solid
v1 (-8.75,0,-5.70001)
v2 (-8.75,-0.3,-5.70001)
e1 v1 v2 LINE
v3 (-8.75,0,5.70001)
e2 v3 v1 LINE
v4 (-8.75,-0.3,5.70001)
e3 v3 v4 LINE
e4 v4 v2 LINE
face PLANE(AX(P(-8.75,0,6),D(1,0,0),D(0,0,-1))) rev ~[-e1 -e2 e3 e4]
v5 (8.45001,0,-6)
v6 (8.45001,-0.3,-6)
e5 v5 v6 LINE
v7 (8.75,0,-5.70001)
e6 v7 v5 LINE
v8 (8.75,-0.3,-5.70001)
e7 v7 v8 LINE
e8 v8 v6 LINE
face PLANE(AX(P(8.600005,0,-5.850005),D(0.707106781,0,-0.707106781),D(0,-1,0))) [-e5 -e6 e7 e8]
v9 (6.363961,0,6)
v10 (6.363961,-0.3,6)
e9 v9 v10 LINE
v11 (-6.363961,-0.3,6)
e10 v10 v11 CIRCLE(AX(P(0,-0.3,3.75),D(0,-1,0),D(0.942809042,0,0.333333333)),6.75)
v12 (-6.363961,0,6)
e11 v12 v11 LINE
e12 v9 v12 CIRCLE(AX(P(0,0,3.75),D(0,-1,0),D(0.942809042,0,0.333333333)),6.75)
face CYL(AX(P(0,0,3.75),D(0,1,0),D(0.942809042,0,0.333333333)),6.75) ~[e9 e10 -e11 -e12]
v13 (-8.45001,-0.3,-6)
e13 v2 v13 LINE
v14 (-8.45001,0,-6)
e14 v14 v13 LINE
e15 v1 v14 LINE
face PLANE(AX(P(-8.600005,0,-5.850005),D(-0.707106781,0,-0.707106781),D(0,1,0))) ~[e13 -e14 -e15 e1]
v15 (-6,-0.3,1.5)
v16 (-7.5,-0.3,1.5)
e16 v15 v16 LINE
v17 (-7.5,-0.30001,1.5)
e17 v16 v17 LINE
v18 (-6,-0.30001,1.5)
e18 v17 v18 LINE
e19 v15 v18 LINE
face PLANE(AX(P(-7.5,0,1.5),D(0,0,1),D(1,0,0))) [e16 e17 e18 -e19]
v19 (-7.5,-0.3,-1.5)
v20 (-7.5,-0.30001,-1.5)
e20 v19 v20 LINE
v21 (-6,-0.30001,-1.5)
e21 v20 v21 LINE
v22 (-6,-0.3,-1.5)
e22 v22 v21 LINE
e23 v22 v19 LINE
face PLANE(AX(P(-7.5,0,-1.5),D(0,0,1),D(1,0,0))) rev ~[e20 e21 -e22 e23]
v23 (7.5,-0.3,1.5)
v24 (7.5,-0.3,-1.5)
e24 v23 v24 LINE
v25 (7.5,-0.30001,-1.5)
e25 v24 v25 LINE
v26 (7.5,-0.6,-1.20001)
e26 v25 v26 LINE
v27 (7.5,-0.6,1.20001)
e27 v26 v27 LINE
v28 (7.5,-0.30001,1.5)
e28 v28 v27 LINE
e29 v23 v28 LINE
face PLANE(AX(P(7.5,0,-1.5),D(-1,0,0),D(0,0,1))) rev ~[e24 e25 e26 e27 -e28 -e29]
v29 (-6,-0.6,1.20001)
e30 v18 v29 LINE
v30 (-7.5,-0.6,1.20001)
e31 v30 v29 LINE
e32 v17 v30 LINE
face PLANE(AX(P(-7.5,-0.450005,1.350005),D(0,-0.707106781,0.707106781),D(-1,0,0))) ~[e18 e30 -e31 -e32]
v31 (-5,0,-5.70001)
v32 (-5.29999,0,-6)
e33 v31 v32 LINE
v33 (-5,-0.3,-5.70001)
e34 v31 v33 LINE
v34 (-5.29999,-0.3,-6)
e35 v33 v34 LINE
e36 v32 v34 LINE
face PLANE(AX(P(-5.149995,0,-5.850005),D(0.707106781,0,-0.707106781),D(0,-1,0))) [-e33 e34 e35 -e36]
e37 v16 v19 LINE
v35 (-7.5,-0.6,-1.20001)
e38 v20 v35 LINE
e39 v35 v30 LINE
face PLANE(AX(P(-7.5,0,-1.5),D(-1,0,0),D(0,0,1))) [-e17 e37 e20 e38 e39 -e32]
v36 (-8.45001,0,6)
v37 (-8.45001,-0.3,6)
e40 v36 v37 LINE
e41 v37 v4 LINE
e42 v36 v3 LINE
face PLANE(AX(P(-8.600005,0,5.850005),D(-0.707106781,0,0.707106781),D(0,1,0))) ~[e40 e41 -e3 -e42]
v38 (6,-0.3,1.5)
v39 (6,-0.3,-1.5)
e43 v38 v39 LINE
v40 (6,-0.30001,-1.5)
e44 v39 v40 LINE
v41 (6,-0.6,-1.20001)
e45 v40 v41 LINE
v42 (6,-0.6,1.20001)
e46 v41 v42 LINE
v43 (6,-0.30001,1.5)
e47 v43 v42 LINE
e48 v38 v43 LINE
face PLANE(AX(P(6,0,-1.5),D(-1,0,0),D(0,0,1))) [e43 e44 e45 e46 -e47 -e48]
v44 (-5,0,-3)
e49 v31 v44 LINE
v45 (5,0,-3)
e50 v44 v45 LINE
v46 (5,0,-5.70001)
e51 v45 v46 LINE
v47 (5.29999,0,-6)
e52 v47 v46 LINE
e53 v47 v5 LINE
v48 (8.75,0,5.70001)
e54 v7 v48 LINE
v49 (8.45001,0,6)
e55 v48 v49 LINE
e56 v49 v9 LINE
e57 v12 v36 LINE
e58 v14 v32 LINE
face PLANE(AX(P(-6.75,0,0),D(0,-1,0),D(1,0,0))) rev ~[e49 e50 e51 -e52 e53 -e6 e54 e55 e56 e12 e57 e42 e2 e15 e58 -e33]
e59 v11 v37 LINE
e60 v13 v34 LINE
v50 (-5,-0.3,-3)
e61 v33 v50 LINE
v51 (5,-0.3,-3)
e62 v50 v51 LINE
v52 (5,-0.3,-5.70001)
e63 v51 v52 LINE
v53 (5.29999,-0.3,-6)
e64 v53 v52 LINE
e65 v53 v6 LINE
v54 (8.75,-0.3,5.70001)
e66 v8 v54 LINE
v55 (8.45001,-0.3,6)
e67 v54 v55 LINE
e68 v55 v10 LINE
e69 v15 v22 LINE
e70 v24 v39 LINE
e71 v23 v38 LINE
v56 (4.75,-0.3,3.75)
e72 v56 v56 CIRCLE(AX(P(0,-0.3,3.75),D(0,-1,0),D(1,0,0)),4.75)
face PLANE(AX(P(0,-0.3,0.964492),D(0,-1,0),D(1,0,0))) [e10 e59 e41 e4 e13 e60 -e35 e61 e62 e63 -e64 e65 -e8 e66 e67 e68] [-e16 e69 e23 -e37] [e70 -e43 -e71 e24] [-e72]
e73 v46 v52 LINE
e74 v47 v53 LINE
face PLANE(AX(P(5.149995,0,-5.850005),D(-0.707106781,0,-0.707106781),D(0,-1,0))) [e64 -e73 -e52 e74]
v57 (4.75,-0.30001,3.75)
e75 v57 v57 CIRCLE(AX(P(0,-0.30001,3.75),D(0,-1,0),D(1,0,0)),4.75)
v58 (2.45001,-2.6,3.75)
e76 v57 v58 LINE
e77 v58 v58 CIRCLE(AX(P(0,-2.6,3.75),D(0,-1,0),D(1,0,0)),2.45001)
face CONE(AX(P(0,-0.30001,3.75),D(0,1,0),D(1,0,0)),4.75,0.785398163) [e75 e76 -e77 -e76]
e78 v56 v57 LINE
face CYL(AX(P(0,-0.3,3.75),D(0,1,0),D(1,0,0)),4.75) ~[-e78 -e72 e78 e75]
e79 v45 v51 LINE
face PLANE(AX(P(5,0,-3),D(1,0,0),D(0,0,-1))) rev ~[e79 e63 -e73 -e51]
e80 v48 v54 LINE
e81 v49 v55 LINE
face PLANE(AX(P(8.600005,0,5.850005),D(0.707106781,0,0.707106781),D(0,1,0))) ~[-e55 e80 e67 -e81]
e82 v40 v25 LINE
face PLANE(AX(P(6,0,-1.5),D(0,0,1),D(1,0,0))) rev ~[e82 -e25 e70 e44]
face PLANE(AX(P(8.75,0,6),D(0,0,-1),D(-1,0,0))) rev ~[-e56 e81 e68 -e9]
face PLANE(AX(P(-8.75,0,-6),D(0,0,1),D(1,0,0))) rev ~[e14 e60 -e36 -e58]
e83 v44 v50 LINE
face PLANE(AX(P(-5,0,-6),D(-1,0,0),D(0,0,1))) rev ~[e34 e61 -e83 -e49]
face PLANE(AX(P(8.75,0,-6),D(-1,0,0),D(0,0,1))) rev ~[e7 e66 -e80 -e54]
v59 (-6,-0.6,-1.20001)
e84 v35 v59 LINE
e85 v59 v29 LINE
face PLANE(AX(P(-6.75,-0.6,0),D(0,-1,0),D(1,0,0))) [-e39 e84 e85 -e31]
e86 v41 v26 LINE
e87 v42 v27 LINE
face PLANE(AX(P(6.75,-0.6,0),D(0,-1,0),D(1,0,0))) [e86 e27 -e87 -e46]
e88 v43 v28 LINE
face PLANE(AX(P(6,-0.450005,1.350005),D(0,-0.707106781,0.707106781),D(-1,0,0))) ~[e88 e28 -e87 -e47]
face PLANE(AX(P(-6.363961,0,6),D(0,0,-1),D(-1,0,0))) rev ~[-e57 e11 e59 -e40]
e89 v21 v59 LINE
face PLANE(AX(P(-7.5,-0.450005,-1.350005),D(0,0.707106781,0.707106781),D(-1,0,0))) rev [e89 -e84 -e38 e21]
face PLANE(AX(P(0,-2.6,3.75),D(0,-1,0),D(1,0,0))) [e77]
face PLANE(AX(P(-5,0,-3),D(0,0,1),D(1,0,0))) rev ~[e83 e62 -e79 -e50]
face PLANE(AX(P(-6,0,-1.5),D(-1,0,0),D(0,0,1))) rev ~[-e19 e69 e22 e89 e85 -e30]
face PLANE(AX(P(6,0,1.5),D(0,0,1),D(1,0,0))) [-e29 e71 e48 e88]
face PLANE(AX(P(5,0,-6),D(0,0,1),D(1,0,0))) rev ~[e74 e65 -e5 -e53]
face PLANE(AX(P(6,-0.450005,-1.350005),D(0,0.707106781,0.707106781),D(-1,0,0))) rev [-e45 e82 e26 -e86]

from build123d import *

# Parameters (mm, degrees)
F0_W     = 1.5
F0_H     = 3
F1_DEPTH = 0.3
F2_DEPTH = 0.6
F3_R     = 4.75
F4_DEPTH = 2.3
F5_SIZE  = 2.29999
F6_SIZE  = 0.29999


# Not quite as in the source:
# - a fillet or chamfer is up to 0.001 mm smaller than in the source, because OpenCascade refuses the exact size


with BuildPart() as f1:
    # F0 (on Front) → F1 (new body)
    with BuildSketch(Plane.XZ):
        with BuildLine():
            Line((8.75, -6), (8.75, 6))
            Line((8.75, 6), (6.3639610307, 6))
            ThreePointArc((6.3639610307, 6), (0, 10.5), (-6.3639610307, 6))
            Line((-6.3639610307, 6), (-8.75, 6))
            Line((-8.75, 6), (-8.75, -6))
            Line((-8.75, -6), (-5, -6))
            Line((-5, -6), (-5, -3))
            Line((-5, -3), (5, -3))
            Line((5, -3), (5, -6))
            Line((5, -6), (8.75, -6))
        make_face()
        with Locations((-6.75, 0)):
            Rectangle(F0_W, F0_H, mode=Mode.SUBTRACT)
        with Locations((6.75, 0)):
            Rectangle(F0_W, F0_H, mode=Mode.SUBTRACT)
        with Locations((-6.75, 0)):
            Rectangle(F0_W, F0_H)
        with Locations((6.75, 0)):
            Rectangle(F0_W, F0_H)
    extrude(amount=F1_DEPTH)

    # F0 (on Front) → F2 (join)
    with BuildSketch(Plane.XZ):
        with Locations((-6.75, 0)):
            Rectangle(F0_W, F0_H)
        with Locations((6.75, 0)):
            Rectangle(F0_W, F0_H)
    extrude(amount=F2_DEPTH)

    # F3 (on face) → F4 (join)
    with BuildSketch(Plane.XZ.offset(0.3)):
        with Locations((0, 3.75)):
            Circle(F3_R)
    extrude(amount=F4_DEPTH)

    # F5 (size 2.3 in the source; OpenCascade refuses exactly that, so slightly less here)
    f5_edges = [f1.edges().sort_by_distance(p)[0] for p in [
        (-4.75, -2.6, 3.75),
    ]]
    chamfer(f5_edges, length=F5_SIZE)

    # F6 (size 0.3 in the source; OpenCascade refuses exactly that, so slightly less here)
    f6_edges = [f1.edges().sort_by_distance(p)[0] for p in [
        (-6.75, -0.6, -1.5),
        (-6.75, -0.6, 1.5),
        (6.75, -0.6, -1.5),
        (6.75, -0.6, 1.5),
        (-5, -0.15, -6),
        (-8.75, -0.15, -6),
        (5, -0.15, -6),
        (8.75, -0.15, -6),
        (8.75, -0.15, 6),
        (-8.75, -0.15, 6),
    ]]
    chamfer(f6_edges, length=F6_SIZE)


solid = f1.part
